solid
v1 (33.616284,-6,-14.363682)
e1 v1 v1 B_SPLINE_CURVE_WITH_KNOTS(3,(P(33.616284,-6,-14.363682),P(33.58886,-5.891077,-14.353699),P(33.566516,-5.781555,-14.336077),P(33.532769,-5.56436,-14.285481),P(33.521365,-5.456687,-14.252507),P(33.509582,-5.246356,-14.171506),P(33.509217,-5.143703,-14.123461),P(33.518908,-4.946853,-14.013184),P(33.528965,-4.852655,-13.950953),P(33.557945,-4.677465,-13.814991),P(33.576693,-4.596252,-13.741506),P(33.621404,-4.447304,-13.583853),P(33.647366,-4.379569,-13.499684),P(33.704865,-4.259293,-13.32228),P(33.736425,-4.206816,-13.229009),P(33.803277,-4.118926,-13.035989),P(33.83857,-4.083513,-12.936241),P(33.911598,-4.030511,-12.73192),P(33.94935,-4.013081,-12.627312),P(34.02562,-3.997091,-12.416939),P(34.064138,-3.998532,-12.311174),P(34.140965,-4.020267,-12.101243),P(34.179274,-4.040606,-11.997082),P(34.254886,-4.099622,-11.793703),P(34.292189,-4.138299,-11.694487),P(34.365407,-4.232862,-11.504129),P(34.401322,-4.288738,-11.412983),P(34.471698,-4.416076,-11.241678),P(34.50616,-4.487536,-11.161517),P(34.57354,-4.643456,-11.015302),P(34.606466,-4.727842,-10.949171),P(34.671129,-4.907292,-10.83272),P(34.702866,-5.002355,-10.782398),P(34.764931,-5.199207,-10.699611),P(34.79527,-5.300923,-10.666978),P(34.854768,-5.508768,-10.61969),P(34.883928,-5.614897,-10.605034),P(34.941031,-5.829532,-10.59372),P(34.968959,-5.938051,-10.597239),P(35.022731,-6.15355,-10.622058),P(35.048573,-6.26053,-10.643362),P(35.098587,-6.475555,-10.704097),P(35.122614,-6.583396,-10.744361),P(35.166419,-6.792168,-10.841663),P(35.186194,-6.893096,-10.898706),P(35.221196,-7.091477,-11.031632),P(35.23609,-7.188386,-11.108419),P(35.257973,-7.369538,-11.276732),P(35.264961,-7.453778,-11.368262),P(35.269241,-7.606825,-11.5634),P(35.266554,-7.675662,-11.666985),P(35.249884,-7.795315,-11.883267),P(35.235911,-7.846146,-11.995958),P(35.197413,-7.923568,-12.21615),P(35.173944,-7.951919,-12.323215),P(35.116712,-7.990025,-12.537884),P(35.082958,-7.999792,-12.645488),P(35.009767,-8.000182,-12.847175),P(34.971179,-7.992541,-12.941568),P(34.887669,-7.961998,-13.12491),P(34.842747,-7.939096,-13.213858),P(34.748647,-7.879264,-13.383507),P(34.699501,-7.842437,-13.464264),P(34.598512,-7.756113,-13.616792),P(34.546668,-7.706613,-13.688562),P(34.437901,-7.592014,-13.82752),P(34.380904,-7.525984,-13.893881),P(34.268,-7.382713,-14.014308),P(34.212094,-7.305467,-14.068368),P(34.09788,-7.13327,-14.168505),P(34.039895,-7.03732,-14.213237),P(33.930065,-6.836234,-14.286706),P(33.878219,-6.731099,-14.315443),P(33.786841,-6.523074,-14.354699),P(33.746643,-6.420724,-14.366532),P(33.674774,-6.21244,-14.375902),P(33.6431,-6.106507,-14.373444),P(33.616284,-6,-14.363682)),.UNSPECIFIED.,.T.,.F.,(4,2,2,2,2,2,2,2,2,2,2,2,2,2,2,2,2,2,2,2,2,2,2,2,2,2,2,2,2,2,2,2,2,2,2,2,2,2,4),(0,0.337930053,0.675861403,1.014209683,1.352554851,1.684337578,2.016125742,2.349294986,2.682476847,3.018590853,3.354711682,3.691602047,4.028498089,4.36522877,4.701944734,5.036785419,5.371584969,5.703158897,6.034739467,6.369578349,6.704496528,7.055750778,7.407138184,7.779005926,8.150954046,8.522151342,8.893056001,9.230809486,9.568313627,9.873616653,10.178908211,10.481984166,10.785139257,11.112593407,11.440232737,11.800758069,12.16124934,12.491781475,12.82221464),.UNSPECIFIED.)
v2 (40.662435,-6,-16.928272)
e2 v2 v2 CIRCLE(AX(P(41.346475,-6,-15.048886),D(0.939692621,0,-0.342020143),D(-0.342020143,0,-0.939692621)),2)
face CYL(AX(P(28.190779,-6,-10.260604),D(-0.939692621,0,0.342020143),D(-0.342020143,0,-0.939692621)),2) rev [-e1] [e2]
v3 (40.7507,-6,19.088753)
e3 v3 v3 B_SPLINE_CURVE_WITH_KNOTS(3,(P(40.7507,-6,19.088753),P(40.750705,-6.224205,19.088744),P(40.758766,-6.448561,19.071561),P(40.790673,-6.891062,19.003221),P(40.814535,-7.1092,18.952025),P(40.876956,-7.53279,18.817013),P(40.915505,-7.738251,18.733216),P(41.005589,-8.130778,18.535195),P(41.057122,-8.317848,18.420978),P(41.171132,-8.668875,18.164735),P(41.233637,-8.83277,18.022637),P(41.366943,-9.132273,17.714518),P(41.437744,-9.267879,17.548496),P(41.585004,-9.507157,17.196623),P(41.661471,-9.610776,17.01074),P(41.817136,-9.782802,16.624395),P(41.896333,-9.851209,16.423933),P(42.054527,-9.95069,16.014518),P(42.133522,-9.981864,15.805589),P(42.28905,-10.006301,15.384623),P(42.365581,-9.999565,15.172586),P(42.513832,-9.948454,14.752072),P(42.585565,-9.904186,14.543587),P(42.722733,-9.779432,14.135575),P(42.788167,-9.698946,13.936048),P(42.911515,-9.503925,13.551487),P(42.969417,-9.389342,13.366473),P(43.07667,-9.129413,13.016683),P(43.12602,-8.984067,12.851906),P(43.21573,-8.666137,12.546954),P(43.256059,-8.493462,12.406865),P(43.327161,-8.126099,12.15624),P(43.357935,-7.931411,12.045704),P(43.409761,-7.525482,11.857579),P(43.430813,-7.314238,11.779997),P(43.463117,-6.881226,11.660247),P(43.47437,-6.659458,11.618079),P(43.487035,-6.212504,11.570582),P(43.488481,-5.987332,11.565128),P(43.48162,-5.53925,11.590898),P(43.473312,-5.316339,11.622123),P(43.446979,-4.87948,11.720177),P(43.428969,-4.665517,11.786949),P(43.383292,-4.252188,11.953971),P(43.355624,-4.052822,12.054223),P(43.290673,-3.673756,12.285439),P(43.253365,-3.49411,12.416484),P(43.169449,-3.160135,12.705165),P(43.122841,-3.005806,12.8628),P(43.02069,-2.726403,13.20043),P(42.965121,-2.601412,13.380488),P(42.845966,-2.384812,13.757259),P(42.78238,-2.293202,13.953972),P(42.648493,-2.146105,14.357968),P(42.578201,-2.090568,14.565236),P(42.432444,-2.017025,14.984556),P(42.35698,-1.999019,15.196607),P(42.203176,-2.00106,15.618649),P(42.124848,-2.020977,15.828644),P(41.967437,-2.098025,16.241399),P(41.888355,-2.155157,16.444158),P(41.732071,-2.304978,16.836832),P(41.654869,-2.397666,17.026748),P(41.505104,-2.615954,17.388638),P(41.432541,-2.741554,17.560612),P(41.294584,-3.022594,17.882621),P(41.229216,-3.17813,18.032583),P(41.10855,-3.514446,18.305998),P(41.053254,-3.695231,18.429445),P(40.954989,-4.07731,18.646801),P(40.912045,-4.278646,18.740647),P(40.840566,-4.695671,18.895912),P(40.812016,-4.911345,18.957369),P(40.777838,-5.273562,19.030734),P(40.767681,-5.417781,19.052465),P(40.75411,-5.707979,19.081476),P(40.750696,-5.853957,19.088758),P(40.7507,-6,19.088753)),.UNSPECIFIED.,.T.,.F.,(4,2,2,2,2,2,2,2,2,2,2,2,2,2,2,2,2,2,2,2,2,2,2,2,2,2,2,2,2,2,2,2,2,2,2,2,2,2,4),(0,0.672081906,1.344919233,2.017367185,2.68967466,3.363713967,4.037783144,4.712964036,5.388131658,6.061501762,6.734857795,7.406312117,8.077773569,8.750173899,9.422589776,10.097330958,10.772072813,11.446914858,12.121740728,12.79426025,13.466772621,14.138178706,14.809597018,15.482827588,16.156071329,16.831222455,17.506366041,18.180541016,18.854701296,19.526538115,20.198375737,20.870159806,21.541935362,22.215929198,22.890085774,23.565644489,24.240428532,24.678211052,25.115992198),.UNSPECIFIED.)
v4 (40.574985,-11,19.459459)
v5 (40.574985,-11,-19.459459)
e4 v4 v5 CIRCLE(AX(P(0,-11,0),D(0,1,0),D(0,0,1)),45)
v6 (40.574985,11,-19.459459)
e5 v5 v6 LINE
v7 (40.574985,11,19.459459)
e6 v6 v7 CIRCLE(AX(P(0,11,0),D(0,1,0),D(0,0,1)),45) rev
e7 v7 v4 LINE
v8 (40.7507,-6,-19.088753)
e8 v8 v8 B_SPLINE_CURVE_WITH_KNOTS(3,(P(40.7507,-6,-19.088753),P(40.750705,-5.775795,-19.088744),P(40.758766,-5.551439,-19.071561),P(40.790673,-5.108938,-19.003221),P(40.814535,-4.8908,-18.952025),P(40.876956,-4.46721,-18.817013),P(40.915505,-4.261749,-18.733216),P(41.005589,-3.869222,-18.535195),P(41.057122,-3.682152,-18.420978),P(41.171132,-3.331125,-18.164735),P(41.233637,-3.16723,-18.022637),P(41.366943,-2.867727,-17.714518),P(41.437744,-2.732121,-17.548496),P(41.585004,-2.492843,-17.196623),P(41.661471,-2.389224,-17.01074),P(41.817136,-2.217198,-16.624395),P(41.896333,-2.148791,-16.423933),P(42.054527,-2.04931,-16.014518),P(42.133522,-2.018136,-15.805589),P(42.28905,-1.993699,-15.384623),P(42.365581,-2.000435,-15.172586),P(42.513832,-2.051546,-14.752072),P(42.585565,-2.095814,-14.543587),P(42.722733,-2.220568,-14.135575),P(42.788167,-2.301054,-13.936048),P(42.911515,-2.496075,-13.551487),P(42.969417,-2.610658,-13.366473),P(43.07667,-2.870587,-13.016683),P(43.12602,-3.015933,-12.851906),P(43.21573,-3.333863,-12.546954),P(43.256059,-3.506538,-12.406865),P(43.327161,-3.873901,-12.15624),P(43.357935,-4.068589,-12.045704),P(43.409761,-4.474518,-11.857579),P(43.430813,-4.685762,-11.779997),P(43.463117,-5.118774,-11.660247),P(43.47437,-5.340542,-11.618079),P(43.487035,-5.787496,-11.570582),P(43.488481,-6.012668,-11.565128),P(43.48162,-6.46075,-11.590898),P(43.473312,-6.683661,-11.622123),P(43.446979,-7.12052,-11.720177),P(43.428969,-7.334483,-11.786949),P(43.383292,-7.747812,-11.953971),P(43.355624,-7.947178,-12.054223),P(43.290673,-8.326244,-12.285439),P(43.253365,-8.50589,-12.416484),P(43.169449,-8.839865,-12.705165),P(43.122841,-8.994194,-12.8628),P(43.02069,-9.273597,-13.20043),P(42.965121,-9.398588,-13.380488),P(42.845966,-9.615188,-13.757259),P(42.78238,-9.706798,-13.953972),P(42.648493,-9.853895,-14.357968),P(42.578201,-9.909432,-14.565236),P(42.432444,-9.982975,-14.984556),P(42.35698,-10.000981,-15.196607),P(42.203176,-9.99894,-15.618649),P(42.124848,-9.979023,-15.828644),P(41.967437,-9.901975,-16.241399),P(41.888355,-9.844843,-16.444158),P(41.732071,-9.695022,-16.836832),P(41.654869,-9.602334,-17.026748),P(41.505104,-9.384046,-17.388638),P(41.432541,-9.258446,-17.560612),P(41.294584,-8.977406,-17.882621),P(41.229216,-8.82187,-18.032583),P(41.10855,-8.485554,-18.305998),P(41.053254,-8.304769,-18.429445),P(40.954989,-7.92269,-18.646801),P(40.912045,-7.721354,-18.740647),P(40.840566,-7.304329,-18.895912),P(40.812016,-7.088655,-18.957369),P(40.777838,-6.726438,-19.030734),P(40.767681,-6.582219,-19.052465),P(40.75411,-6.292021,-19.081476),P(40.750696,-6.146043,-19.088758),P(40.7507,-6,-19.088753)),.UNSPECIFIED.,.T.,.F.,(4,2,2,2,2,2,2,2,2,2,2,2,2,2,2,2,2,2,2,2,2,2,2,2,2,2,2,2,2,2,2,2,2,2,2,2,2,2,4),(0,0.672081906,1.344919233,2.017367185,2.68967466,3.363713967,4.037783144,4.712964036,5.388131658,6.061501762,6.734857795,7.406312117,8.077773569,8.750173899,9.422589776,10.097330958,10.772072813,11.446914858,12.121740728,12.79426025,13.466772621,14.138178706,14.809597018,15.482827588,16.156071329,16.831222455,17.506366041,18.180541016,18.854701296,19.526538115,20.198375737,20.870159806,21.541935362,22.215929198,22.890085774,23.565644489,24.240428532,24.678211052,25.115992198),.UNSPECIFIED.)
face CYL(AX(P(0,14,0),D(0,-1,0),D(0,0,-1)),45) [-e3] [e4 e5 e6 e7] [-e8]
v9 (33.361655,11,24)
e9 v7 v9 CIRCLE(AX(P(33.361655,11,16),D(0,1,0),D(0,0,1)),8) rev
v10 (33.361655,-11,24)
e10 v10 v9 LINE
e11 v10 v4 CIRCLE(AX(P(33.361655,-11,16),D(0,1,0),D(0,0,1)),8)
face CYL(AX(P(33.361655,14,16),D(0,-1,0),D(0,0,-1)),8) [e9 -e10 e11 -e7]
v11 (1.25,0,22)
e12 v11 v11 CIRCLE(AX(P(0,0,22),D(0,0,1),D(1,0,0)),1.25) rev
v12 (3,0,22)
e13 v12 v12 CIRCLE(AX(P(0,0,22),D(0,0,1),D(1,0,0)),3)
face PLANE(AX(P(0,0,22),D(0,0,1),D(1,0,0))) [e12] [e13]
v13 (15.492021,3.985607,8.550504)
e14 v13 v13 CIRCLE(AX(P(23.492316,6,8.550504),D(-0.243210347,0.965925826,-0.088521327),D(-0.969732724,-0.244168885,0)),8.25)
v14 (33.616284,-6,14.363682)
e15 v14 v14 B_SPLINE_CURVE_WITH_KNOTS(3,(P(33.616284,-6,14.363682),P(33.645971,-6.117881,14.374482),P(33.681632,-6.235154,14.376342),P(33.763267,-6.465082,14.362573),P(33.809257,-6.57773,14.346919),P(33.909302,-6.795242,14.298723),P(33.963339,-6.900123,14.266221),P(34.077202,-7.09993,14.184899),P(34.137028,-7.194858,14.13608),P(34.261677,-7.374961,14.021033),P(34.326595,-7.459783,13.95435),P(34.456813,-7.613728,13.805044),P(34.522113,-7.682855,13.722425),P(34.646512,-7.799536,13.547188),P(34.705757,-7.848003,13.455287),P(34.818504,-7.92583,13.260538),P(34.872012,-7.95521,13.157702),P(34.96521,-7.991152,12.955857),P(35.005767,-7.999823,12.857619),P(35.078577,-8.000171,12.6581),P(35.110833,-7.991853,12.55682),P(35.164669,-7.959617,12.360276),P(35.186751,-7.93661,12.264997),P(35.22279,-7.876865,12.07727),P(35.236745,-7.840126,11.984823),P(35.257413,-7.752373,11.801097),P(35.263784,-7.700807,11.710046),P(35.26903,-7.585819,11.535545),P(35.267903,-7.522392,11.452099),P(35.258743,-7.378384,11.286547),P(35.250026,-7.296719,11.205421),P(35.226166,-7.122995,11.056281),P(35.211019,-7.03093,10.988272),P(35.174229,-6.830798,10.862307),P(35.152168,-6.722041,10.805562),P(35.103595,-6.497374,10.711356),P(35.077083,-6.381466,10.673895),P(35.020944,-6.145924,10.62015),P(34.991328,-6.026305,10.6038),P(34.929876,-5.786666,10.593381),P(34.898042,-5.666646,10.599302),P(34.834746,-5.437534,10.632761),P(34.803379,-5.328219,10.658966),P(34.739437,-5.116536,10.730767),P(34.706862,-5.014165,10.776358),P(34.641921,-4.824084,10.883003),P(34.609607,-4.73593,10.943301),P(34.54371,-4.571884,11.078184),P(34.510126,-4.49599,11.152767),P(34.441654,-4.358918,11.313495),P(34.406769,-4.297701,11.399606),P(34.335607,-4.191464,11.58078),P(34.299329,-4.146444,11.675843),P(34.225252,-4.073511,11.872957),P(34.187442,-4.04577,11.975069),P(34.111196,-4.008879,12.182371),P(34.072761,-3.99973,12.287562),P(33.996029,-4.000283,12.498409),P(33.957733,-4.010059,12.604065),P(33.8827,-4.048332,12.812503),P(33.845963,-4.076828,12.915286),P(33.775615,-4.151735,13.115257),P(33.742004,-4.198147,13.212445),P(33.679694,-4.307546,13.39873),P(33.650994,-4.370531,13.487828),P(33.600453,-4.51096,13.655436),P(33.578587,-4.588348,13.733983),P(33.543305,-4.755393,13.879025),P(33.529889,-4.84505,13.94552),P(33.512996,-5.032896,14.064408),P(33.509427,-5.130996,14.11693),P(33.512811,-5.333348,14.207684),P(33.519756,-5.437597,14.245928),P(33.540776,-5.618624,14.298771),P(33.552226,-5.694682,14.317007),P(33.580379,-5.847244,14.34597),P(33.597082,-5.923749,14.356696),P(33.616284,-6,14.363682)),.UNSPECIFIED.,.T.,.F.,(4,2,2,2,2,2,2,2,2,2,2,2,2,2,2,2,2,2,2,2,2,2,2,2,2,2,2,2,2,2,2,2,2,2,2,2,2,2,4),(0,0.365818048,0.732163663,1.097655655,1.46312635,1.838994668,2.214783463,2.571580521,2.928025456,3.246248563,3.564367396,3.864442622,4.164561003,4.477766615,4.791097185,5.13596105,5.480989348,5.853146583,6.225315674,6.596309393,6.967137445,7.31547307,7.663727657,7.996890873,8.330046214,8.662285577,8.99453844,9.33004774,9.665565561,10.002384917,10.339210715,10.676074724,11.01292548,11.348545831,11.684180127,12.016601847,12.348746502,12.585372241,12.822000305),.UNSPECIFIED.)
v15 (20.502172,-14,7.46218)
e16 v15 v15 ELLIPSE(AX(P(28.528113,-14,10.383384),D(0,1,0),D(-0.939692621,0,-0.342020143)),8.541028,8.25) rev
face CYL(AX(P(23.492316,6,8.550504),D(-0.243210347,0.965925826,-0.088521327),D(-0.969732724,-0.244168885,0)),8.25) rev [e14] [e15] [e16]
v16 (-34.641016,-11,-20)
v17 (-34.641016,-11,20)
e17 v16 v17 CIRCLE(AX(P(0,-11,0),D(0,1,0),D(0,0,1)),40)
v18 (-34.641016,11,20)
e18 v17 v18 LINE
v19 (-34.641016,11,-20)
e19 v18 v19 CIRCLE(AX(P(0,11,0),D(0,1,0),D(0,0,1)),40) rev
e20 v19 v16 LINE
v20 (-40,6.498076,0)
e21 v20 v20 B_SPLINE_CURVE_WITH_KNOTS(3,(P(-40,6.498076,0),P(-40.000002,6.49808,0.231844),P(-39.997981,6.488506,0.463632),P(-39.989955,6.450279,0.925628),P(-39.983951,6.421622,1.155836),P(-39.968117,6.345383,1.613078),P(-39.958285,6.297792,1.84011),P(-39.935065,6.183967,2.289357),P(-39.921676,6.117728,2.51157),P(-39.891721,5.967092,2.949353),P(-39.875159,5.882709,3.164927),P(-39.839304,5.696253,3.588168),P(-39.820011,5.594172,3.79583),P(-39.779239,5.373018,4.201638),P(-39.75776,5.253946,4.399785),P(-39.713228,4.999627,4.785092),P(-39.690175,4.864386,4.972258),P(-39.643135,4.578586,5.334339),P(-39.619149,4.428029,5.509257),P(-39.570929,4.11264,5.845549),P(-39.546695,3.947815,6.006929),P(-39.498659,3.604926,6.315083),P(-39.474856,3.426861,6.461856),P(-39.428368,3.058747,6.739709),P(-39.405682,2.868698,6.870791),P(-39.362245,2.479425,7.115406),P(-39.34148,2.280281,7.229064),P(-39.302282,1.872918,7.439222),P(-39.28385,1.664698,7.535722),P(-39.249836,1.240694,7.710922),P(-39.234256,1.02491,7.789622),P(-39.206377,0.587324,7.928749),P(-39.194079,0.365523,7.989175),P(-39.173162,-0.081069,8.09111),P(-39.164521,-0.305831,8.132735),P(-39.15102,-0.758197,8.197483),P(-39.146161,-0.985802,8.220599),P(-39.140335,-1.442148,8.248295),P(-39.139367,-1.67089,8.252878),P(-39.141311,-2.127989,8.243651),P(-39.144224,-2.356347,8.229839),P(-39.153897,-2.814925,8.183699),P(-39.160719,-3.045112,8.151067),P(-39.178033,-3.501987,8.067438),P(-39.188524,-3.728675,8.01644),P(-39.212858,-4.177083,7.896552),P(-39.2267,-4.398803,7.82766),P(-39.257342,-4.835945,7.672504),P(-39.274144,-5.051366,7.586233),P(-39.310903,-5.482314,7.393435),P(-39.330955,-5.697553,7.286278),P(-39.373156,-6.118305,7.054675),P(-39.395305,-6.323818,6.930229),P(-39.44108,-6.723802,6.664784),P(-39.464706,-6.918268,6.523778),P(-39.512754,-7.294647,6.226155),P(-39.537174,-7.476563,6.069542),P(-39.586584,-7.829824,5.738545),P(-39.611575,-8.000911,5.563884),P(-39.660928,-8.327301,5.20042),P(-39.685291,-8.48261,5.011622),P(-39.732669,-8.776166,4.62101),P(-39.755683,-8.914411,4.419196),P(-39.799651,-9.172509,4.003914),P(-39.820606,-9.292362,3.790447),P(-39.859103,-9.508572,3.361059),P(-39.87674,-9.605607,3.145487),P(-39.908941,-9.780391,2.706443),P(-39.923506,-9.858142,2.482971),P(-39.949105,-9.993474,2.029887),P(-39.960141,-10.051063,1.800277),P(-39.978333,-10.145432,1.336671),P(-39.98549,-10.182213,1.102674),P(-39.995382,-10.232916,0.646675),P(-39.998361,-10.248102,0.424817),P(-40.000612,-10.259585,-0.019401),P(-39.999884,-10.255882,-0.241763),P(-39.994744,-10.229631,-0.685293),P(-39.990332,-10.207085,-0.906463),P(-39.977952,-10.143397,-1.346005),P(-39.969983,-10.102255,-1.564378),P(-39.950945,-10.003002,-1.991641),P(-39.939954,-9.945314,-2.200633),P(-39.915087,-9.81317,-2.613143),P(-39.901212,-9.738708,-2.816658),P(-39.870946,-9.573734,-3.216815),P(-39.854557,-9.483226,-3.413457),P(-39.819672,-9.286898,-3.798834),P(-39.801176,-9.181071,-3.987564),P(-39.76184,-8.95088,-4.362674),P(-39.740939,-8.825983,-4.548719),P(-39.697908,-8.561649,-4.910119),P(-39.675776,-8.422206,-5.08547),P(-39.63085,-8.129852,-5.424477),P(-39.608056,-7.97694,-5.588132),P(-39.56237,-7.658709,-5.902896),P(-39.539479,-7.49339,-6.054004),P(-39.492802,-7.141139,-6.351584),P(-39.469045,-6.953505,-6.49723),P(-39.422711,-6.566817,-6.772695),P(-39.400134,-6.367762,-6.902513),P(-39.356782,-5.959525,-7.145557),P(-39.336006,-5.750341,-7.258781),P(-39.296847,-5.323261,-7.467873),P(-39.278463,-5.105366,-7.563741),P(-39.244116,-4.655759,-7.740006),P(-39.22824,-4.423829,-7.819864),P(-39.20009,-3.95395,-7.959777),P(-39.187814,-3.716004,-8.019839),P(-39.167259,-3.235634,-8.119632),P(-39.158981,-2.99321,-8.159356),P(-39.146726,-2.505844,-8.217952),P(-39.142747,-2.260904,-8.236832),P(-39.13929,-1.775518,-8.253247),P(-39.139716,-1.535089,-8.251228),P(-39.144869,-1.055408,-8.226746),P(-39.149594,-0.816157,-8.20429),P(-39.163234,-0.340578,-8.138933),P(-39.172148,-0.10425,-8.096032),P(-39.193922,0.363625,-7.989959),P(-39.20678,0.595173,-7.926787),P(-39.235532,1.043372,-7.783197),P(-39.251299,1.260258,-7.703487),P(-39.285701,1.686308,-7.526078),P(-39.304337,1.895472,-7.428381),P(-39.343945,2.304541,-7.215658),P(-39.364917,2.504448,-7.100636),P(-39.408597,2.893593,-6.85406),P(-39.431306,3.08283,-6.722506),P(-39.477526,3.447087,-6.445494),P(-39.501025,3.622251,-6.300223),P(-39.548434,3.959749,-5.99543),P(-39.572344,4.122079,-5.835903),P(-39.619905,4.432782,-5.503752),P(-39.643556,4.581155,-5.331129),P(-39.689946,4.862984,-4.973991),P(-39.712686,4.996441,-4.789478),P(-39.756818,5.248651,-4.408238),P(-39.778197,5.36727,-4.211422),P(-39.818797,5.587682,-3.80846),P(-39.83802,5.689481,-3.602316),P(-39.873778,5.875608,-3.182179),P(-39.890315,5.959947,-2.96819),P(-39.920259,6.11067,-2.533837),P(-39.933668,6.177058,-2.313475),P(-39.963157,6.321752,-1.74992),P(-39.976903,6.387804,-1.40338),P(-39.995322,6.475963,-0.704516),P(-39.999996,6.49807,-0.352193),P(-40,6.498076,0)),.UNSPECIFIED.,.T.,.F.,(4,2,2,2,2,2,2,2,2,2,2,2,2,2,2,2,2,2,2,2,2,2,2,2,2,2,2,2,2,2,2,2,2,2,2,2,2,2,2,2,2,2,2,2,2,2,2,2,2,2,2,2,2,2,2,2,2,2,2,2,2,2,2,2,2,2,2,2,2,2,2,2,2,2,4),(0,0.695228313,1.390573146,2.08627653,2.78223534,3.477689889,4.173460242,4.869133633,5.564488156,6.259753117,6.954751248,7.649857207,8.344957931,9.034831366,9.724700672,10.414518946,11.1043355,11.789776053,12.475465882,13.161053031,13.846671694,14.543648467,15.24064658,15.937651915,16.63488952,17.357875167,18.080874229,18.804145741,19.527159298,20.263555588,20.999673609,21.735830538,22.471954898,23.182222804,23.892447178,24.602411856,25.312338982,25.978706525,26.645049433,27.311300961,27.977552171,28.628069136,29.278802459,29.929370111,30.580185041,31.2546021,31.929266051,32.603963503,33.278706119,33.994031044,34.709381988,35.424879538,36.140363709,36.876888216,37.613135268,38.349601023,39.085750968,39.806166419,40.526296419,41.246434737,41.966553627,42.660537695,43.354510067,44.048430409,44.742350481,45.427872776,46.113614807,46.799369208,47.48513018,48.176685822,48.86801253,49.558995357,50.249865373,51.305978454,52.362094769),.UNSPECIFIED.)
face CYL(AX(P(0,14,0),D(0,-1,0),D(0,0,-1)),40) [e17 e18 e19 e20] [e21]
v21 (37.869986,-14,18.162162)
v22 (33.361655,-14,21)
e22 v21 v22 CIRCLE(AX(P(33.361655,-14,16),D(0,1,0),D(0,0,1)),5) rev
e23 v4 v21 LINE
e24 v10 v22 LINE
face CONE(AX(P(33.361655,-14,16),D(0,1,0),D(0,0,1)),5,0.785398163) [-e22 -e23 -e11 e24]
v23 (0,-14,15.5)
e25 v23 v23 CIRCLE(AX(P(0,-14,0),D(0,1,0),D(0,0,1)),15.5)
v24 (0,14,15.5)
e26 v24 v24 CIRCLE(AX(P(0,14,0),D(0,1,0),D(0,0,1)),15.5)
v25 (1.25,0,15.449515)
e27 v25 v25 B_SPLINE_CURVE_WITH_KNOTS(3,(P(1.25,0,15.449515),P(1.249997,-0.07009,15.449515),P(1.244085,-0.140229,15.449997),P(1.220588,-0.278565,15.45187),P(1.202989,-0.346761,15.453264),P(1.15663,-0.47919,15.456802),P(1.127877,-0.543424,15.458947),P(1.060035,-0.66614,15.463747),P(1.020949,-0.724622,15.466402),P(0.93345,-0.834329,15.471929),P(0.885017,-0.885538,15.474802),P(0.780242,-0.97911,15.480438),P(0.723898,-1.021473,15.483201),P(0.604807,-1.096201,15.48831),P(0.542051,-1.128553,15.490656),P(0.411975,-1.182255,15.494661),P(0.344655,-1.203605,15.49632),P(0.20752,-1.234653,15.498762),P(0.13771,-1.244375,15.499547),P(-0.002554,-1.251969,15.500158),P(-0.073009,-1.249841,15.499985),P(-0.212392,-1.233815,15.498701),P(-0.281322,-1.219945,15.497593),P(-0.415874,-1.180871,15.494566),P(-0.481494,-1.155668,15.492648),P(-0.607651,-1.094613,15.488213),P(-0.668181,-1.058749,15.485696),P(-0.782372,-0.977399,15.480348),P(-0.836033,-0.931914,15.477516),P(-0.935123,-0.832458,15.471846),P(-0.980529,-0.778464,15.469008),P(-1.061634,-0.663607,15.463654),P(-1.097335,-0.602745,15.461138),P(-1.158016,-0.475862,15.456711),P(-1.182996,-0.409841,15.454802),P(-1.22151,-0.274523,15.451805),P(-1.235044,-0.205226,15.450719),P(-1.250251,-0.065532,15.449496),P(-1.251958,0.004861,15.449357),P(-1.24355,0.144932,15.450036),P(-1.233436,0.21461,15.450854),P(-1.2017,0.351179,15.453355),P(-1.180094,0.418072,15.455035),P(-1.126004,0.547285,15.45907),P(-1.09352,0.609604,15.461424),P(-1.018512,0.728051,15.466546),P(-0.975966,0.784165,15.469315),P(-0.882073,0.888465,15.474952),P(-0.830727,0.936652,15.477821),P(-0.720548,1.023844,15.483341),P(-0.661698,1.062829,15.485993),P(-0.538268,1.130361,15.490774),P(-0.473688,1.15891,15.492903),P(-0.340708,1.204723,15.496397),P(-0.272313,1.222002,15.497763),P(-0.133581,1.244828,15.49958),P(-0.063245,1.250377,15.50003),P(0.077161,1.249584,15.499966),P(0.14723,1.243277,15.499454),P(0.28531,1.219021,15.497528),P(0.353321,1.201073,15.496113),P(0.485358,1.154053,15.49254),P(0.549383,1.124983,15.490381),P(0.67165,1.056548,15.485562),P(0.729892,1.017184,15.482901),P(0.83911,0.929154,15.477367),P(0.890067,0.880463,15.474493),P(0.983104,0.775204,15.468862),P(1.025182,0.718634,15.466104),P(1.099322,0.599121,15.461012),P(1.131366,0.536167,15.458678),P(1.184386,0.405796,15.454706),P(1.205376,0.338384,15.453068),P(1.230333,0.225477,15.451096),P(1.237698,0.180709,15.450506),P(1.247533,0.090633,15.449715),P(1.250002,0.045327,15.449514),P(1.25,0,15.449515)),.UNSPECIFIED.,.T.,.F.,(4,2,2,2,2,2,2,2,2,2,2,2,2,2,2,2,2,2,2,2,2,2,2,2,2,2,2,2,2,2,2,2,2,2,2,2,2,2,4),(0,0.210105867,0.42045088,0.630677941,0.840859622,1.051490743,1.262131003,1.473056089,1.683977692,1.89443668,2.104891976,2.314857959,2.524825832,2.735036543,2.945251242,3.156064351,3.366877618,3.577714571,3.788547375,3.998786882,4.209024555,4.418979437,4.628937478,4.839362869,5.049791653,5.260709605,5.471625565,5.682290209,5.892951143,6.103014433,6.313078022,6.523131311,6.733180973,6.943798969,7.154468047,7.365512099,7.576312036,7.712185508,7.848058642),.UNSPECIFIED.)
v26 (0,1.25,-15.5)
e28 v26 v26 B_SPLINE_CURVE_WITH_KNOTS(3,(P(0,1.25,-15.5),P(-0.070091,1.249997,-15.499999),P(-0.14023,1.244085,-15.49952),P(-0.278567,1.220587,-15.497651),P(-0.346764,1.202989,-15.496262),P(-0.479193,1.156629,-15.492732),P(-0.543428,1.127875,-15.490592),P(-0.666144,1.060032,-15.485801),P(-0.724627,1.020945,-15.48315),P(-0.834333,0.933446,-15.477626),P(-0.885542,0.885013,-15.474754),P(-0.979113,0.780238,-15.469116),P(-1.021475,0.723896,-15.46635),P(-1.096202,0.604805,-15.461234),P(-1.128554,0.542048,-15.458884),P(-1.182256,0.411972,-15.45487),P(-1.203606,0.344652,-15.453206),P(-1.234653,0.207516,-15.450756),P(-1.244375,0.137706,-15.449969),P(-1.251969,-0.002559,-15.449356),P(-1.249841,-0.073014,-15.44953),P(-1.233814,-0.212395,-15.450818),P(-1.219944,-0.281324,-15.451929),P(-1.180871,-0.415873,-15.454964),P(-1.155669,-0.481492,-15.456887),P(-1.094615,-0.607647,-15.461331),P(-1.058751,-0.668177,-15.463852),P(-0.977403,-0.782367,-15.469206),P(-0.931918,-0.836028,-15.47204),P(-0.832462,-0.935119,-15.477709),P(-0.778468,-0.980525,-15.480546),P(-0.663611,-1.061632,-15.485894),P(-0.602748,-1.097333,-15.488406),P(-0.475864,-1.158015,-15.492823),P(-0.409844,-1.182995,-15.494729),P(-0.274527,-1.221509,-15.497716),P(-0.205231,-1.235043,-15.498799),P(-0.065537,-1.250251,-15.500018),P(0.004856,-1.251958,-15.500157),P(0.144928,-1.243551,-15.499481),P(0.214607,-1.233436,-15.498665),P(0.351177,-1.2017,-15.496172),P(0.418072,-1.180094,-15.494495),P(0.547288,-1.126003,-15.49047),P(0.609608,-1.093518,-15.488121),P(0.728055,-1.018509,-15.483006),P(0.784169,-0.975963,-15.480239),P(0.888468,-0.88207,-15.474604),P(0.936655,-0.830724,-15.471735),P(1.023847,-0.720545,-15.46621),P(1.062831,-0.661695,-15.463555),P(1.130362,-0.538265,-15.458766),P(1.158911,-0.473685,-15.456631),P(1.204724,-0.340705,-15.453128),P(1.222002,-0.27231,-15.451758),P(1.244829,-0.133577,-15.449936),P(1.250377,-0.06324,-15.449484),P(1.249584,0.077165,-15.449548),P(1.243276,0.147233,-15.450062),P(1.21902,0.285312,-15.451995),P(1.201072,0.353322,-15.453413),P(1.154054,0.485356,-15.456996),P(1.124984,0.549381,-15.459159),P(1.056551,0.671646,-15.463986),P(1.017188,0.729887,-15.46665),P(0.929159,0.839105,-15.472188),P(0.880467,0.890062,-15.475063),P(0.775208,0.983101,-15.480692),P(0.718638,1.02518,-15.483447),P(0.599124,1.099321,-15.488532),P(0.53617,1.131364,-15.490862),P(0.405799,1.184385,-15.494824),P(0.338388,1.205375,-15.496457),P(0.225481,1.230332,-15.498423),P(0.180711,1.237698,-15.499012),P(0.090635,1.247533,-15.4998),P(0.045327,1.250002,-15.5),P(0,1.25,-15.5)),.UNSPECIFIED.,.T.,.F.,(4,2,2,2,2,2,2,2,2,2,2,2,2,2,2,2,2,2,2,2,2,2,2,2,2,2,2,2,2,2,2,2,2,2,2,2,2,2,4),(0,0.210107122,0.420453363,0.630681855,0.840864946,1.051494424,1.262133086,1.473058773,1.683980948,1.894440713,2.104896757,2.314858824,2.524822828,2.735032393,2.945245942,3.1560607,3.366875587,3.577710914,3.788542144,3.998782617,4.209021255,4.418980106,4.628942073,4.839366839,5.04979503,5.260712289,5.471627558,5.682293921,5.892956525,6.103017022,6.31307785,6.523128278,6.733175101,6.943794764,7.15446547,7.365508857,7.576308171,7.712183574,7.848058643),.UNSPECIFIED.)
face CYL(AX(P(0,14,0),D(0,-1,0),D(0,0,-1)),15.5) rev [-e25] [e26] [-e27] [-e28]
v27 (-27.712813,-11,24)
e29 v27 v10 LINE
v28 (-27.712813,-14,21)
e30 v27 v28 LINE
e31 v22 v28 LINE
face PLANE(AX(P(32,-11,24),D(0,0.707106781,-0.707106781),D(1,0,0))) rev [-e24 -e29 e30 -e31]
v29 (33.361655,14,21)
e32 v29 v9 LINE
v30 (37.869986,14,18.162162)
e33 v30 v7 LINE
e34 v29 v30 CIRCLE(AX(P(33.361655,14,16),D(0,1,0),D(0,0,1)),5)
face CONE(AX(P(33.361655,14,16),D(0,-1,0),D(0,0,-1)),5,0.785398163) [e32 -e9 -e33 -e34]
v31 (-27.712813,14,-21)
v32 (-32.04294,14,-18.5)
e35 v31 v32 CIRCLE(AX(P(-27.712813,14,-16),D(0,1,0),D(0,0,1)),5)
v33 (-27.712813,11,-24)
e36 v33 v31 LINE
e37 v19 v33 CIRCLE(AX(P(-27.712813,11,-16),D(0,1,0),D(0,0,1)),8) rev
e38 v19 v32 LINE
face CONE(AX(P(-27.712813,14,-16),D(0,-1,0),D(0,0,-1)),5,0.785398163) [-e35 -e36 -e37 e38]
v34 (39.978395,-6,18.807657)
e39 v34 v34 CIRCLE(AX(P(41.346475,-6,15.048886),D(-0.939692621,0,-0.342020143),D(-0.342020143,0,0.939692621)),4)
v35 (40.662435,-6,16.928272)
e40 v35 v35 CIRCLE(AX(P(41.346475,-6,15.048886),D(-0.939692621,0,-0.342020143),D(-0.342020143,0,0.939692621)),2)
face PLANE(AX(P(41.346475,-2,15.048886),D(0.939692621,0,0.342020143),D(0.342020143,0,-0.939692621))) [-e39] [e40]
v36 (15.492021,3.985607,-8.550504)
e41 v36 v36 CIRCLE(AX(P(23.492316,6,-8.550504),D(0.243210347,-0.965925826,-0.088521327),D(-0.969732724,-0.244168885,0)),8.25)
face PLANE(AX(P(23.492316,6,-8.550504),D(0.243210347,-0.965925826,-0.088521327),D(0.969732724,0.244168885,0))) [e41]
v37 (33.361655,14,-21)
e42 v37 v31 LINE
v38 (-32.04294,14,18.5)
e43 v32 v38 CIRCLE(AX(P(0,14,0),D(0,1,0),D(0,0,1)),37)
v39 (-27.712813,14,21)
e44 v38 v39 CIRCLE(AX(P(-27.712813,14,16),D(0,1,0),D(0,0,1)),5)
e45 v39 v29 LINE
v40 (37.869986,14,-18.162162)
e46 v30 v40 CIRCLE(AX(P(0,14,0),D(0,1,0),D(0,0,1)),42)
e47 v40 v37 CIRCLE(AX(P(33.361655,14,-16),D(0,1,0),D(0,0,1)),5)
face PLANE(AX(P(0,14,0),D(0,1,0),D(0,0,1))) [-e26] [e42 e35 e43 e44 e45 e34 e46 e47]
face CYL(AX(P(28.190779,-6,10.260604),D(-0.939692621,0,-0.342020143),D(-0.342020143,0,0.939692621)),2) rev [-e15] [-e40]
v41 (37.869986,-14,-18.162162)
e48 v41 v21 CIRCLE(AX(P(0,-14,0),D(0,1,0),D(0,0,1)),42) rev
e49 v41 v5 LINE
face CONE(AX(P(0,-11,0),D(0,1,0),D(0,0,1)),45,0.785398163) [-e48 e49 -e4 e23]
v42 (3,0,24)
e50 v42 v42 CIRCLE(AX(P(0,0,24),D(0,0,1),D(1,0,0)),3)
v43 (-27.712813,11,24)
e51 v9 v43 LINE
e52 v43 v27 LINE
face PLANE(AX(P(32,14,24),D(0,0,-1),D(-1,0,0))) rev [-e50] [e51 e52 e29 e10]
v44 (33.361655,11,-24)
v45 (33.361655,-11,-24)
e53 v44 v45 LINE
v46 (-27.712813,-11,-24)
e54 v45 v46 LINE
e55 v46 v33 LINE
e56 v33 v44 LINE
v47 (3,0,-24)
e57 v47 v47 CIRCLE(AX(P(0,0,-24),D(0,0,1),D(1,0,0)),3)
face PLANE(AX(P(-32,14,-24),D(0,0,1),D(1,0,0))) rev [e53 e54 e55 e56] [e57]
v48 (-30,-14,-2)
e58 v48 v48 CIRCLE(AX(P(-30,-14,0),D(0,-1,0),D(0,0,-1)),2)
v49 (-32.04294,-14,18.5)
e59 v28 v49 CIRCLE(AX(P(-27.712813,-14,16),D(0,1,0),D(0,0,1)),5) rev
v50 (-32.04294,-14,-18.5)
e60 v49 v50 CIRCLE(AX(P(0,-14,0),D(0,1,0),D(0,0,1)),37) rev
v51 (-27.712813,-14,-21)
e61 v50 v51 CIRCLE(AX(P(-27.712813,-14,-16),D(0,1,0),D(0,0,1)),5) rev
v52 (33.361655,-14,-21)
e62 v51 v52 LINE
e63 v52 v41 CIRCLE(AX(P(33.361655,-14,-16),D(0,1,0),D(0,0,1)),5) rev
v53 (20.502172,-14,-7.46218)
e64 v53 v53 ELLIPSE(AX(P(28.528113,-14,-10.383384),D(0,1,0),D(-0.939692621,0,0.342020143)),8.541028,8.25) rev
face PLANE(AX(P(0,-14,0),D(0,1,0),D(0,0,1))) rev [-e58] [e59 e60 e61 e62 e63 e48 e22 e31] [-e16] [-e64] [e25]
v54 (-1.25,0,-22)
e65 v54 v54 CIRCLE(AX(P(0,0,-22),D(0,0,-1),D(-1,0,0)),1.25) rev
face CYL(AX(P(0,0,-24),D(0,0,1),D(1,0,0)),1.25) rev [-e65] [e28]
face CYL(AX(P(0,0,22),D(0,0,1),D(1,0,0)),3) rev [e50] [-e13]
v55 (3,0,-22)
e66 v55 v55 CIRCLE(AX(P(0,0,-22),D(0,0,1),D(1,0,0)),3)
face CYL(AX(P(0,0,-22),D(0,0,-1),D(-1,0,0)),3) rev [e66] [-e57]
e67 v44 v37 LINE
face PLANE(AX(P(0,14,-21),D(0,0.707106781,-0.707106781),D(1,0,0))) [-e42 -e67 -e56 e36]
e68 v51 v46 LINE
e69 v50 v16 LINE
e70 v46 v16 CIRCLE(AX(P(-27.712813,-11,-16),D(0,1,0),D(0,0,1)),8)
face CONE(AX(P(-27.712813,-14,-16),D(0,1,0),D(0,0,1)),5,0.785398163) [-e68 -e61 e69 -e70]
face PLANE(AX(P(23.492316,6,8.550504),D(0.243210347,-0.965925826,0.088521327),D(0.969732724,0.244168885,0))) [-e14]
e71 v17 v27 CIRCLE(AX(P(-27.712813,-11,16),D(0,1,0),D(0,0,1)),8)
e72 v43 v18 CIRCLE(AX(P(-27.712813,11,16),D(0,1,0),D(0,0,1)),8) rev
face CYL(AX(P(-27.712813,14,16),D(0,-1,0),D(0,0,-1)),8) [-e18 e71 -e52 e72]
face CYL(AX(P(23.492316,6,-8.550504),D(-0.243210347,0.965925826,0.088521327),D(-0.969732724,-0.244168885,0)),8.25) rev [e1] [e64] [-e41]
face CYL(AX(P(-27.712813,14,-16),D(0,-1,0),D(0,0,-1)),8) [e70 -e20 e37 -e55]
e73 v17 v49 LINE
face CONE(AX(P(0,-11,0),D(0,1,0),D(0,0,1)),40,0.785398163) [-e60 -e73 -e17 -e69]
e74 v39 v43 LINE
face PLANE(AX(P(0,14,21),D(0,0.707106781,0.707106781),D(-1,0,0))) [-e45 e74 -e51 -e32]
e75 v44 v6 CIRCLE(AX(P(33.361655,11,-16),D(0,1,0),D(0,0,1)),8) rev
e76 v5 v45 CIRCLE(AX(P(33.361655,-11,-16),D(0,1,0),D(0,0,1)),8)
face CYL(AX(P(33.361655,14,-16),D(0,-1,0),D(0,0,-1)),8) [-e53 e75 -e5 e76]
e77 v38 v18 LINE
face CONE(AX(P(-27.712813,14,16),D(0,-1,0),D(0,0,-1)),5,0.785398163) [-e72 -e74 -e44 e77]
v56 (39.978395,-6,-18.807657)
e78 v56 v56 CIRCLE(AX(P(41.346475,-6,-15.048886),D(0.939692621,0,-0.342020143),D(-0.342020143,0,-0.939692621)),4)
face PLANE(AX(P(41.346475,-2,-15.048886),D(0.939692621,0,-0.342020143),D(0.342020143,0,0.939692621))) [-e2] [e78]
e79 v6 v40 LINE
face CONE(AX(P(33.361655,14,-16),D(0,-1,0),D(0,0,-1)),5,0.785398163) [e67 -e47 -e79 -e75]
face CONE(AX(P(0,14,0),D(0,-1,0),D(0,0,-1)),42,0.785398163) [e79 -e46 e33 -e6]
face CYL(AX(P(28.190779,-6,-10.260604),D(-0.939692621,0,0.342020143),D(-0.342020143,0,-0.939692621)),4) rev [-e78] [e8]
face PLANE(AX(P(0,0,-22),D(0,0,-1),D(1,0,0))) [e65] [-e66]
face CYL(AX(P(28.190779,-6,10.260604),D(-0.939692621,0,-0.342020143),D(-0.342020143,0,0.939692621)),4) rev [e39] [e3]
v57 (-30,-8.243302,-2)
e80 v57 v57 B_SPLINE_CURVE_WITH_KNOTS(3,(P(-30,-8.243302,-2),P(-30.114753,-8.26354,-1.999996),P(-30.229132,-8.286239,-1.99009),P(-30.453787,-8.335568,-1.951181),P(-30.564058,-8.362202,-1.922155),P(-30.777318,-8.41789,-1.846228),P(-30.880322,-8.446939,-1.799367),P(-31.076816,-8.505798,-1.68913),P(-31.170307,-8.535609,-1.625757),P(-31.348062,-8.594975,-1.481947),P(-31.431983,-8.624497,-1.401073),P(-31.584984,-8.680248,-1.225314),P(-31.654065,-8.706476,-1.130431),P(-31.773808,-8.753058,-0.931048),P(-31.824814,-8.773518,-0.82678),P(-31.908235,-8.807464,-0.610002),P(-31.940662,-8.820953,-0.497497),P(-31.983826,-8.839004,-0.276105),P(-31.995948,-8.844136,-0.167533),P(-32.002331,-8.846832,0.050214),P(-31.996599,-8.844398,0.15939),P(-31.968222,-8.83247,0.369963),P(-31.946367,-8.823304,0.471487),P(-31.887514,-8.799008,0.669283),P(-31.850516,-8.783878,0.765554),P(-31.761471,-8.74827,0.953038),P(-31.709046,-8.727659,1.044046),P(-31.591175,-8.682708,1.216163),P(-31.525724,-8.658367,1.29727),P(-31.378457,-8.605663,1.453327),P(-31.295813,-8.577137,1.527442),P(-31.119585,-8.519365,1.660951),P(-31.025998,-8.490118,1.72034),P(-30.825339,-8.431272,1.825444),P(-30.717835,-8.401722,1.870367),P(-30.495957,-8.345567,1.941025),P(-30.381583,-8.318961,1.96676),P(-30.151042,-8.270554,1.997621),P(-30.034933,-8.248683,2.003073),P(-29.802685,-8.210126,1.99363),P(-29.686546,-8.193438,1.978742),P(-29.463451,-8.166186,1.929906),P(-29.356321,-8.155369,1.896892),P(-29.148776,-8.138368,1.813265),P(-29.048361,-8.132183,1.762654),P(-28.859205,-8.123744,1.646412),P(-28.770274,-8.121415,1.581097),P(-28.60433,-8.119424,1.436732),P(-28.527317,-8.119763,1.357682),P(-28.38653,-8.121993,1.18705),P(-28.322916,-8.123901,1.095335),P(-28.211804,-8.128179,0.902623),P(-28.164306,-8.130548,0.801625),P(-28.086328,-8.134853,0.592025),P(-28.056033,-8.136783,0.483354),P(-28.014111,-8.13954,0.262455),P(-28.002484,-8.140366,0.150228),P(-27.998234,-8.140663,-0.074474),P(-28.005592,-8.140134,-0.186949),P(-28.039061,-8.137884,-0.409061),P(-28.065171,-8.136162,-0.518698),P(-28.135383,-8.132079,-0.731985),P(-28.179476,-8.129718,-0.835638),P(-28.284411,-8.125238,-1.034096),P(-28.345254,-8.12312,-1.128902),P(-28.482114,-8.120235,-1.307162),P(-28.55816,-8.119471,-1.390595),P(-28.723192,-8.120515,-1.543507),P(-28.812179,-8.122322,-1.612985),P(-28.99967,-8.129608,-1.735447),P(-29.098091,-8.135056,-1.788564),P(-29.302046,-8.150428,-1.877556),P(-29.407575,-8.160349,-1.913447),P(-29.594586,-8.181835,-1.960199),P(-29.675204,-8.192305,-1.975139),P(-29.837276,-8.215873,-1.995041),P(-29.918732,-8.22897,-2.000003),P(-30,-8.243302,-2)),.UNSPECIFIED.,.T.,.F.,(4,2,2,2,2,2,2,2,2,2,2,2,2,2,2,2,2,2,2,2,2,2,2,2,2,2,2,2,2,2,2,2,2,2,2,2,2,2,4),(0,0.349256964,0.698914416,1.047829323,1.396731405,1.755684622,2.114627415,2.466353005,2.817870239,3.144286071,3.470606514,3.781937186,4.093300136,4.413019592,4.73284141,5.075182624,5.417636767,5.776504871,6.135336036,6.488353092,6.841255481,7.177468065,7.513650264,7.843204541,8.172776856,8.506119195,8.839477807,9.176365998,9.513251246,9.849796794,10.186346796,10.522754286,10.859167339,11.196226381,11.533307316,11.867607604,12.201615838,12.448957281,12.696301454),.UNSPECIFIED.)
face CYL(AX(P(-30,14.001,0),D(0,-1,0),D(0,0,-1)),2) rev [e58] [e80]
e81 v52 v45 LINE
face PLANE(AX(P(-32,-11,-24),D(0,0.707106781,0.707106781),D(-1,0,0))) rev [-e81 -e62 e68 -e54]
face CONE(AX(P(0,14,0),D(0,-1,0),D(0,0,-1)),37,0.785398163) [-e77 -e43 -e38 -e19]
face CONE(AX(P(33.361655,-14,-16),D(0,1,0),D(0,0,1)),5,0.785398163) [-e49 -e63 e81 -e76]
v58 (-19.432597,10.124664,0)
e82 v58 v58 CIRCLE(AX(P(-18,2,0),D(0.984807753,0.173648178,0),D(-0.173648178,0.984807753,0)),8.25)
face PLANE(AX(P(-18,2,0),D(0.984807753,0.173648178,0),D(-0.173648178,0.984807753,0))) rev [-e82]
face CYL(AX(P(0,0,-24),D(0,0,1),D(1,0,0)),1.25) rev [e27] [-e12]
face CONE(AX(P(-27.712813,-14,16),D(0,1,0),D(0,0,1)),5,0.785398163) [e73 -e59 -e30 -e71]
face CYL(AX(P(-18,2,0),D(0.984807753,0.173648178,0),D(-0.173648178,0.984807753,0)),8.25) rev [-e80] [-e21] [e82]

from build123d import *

# Parameters (mm, degrees)
SKETCH1_R               = 15.5
BOSS_EXTRUDE1_DEPTH     = 14
MOVE_START              = -14
MOVE_FACE1_DEPTH        = 28
CUT_EXTRUDE2_REACH      = 60.181
CUT_EXTRUDE2_END_RADIUS = 8.25
SKETCH5_R               = 2
SKETCH7_R               = 1.25
CUT_EXTRUDE3_DEPTH      = 68.268120394
FILLET1_R               = 8
CHAMFER1_SIZE           = 3
SKETCH8_R               = 3
CUT_EXTRUDE4_DEPTH      = 2


# Read off the part's stored shape, not the designer's step: Move Face1
with BuildPart() as part:
    # Sketch1 → Boss-Extrude1 (new, symmetric)
    with BuildSketch(Plane(origin=(0, 0, 0), x_dir=(1, 0, 0), z_dir=(0, 1, 0))):
        with BuildLine():
            Line((-32, 24), (32, 24))
            ThreePointArc((32, 24), (40, 0), (32, -24))
            Line((32, -24), (-32, -24))
            ThreePointArc((-32, -24), (-40, 0), (-32, 24))
        make_face()
        with Locations(Location((0, 0, 0), (0, 0, 270))):
            Circle(SKETCH1_R, mode=Mode.SUBTRACT)
    extrude(amount=BOSS_EXTRUDE1_DEPTH, both=True)

    # Sketch3 → Cut-Revolve1 (revolve, cut)
    with BuildSketch(Plane.XY):
        Polygon((-18, 2), (-19.432597466, 10.124663962), (-53.885297859, 4.049723325), (-52.452700394, -4.074940638), align=None)
    revolve(axis=Axis((-18, 2, 0), (-0.9848077530122092, -0.1736481776669237, 0)), mode=Mode.SUBTRACT)

    # Move Face1 outline → Move Face1 (add)
    with BuildSketch(Plane(origin=(0, 0, 0), x_dir=(1, 0, 0), z_dir=(0, 1, 0)).offset(MOVE_START)):
        with BuildLine():
            ThreePointArc((38.065732621, -24), (45, 0), (38.065732621, 24))
            Line((38.065732621, 24), (32, 24))
            ThreePointArc((32, 24), (40, 0), (32, -24))
            Line((32, -24), (38.065732621, -24))
        make_face()
    extrude(amount=MOVE_FACE1_DEPTH)

    # Sketch4 → Cut-Revolve2 (revolve, cut)
    with BuildSketch(Plane(origin=(0, 0, 0), x_dir=(0, -1, 0), z_dir=(-0.34202014332566943, 0, 0.9396926207859081)), mode=Mode.PRIVATE) as cut_revolve2_sk:
        Polygon((-6, 25), (-8.135257122, 32.968888067), (31.446035064, 43.574663343), (33.581292186, 35.605775277), align=None)
    cut_revolve2 = revolve(cut_revolve2_sk.sketch.rotate(Axis((23.49231552, 6, 8.550503583), (0.24321034680169487, -0.9659258262890681, 0.08852132690137743)), 160.629944791), axis=Axis((23.49231552, 6, 8.550503583), (0.24321034680169487, -0.9659258262890681, 0.08852132690137743)), mode=Mode.SUBTRACT)

    # Sketch6 → Cut-Revolve3 (revolve, cut)
    with BuildSketch(Plane(origin=(0, 0, 0), x_dir=(0, -1, 0), z_dir=(-0.34202014332566943, 0, 0.9396926207859081)), mode=Mode.PRIVATE) as cut_revolve3_sk:
        Polygon((4, 30), (6, 30), (6, 45), (6, 46), (2, 46), (2, 45), (2, 44), (4, 44), align=None)
    cut_revolve3 = revolve(cut_revolve3_sk.sketch.rotate(Axis((28.190778624, -6, 10.2606043), (0.9396926207859081, 0, 0.3420201433256695)), 90), axis=Axis((28.190778624, -6, 10.2606043), (0.9396926207859081, 0, 0.3420201433256695)), mode=Mode.SUBTRACT)

    # Mirror1: Cut-Revolve2, Cut-Revolve3 across plane
    add(cut_revolve2.mirror(Plane.XY), mode=Mode.SUBTRACT)
    add(cut_revolve3.mirror(Plane.XY), mode=Mode.SUBTRACT)

    # Cut-Extrude2: up to this cylinder (the profile starts outside it)
    cut_extrude2_end = Plane(origin=(-32.374316871, -0.534579894, 0), z_dir=(0.9848077530122092, 0.1736481776669237, 0)) * Cylinder(CUT_EXTRUDE2_END_RADIUS, 137.862, mode=Mode.PRIVATE)
    # Sketch5 → Cut-Extrude2 (cut, up to the surface)
    with BuildSketch(Plane.XZ.offset(14), mode=Mode.PRIVATE) as cut_extrude2_sk1:
        with Locations(Location((-30, 0, 0), (0, 0, 270))):
            Circle(SKETCH5_R)
    cut_extrude2_tool1 = extrude(cut_extrude2_sk1.sketch, amount=-CUT_EXTRUDE2_REACH, mode=Mode.PRIVATE) - cut_extrude2_end
    add(cut_extrude2_tool1.solids().sort_by_distance((-30, -14, 0))[0], mode=Mode.SUBTRACT)

    # Sketch7 → Cut-Extrude3 (cut, through all)
    with BuildSketch(Plane.XY.offset(24)):
        Circle(SKETCH7_R)
    extrude(amount=-CUT_EXTRUDE3_DEPTH, mode=Mode.SUBTRACT)

    # Fillet1
    fillet1_edges = [part.edges().sort_by_distance(p)[0] for p in [
        (-32, 0, -24),
        (38.065732621, 0, -24),
        (38.065732621, 0, 24),
        (-32, 0, 24),
    ]]
    fillet(fillet1_edges, radius=FILLET1_R)

    # Chamfer1
    chamfer1_edges = [part.edges().sort_by_distance(p)[0] for p in [
        (2.824420857, -14, -24),
        (2.824420857, 14, -24),
        (-40, -14, 0),
        (45, -14, 0),
        (2.824420857, -14, 24),
        (-31.712812921, -14, 22.92820323),
        (-31.712812921, -14, -22.92820323),
        (37.623363466, -14, 22.770364675),
        (37.623363466, -14, -22.770364675),
        (45, 14, 0),
        (-40, 14, 0),
        (2.824420857, 14, 24),
        (-31.712812921, 14, 22.92820323),
        (-31.712812921, 14, -22.92820323),
        (37.623363466, 14, 22.770364675),
        (37.623363466, 14, -22.770364675),
    ]]
    chamfer(chamfer1_edges, length=CHAMFER1_SIZE)

    # Sketch8 → Cut-Extrude4 (cut)
    with BuildSketch(Plane.XY.offset(24)):
        Circle(SKETCH8_R)
    cut_extrude4 = extrude(amount=-CUT_EXTRUDE4_DEPTH, mode=Mode.SUBTRACT)

    # Mirror2: Cut-Extrude4 across plane
    add(cut_extrude4.mirror(Plane.XY), mode=Mode.SUBTRACT)


solid = part.part
